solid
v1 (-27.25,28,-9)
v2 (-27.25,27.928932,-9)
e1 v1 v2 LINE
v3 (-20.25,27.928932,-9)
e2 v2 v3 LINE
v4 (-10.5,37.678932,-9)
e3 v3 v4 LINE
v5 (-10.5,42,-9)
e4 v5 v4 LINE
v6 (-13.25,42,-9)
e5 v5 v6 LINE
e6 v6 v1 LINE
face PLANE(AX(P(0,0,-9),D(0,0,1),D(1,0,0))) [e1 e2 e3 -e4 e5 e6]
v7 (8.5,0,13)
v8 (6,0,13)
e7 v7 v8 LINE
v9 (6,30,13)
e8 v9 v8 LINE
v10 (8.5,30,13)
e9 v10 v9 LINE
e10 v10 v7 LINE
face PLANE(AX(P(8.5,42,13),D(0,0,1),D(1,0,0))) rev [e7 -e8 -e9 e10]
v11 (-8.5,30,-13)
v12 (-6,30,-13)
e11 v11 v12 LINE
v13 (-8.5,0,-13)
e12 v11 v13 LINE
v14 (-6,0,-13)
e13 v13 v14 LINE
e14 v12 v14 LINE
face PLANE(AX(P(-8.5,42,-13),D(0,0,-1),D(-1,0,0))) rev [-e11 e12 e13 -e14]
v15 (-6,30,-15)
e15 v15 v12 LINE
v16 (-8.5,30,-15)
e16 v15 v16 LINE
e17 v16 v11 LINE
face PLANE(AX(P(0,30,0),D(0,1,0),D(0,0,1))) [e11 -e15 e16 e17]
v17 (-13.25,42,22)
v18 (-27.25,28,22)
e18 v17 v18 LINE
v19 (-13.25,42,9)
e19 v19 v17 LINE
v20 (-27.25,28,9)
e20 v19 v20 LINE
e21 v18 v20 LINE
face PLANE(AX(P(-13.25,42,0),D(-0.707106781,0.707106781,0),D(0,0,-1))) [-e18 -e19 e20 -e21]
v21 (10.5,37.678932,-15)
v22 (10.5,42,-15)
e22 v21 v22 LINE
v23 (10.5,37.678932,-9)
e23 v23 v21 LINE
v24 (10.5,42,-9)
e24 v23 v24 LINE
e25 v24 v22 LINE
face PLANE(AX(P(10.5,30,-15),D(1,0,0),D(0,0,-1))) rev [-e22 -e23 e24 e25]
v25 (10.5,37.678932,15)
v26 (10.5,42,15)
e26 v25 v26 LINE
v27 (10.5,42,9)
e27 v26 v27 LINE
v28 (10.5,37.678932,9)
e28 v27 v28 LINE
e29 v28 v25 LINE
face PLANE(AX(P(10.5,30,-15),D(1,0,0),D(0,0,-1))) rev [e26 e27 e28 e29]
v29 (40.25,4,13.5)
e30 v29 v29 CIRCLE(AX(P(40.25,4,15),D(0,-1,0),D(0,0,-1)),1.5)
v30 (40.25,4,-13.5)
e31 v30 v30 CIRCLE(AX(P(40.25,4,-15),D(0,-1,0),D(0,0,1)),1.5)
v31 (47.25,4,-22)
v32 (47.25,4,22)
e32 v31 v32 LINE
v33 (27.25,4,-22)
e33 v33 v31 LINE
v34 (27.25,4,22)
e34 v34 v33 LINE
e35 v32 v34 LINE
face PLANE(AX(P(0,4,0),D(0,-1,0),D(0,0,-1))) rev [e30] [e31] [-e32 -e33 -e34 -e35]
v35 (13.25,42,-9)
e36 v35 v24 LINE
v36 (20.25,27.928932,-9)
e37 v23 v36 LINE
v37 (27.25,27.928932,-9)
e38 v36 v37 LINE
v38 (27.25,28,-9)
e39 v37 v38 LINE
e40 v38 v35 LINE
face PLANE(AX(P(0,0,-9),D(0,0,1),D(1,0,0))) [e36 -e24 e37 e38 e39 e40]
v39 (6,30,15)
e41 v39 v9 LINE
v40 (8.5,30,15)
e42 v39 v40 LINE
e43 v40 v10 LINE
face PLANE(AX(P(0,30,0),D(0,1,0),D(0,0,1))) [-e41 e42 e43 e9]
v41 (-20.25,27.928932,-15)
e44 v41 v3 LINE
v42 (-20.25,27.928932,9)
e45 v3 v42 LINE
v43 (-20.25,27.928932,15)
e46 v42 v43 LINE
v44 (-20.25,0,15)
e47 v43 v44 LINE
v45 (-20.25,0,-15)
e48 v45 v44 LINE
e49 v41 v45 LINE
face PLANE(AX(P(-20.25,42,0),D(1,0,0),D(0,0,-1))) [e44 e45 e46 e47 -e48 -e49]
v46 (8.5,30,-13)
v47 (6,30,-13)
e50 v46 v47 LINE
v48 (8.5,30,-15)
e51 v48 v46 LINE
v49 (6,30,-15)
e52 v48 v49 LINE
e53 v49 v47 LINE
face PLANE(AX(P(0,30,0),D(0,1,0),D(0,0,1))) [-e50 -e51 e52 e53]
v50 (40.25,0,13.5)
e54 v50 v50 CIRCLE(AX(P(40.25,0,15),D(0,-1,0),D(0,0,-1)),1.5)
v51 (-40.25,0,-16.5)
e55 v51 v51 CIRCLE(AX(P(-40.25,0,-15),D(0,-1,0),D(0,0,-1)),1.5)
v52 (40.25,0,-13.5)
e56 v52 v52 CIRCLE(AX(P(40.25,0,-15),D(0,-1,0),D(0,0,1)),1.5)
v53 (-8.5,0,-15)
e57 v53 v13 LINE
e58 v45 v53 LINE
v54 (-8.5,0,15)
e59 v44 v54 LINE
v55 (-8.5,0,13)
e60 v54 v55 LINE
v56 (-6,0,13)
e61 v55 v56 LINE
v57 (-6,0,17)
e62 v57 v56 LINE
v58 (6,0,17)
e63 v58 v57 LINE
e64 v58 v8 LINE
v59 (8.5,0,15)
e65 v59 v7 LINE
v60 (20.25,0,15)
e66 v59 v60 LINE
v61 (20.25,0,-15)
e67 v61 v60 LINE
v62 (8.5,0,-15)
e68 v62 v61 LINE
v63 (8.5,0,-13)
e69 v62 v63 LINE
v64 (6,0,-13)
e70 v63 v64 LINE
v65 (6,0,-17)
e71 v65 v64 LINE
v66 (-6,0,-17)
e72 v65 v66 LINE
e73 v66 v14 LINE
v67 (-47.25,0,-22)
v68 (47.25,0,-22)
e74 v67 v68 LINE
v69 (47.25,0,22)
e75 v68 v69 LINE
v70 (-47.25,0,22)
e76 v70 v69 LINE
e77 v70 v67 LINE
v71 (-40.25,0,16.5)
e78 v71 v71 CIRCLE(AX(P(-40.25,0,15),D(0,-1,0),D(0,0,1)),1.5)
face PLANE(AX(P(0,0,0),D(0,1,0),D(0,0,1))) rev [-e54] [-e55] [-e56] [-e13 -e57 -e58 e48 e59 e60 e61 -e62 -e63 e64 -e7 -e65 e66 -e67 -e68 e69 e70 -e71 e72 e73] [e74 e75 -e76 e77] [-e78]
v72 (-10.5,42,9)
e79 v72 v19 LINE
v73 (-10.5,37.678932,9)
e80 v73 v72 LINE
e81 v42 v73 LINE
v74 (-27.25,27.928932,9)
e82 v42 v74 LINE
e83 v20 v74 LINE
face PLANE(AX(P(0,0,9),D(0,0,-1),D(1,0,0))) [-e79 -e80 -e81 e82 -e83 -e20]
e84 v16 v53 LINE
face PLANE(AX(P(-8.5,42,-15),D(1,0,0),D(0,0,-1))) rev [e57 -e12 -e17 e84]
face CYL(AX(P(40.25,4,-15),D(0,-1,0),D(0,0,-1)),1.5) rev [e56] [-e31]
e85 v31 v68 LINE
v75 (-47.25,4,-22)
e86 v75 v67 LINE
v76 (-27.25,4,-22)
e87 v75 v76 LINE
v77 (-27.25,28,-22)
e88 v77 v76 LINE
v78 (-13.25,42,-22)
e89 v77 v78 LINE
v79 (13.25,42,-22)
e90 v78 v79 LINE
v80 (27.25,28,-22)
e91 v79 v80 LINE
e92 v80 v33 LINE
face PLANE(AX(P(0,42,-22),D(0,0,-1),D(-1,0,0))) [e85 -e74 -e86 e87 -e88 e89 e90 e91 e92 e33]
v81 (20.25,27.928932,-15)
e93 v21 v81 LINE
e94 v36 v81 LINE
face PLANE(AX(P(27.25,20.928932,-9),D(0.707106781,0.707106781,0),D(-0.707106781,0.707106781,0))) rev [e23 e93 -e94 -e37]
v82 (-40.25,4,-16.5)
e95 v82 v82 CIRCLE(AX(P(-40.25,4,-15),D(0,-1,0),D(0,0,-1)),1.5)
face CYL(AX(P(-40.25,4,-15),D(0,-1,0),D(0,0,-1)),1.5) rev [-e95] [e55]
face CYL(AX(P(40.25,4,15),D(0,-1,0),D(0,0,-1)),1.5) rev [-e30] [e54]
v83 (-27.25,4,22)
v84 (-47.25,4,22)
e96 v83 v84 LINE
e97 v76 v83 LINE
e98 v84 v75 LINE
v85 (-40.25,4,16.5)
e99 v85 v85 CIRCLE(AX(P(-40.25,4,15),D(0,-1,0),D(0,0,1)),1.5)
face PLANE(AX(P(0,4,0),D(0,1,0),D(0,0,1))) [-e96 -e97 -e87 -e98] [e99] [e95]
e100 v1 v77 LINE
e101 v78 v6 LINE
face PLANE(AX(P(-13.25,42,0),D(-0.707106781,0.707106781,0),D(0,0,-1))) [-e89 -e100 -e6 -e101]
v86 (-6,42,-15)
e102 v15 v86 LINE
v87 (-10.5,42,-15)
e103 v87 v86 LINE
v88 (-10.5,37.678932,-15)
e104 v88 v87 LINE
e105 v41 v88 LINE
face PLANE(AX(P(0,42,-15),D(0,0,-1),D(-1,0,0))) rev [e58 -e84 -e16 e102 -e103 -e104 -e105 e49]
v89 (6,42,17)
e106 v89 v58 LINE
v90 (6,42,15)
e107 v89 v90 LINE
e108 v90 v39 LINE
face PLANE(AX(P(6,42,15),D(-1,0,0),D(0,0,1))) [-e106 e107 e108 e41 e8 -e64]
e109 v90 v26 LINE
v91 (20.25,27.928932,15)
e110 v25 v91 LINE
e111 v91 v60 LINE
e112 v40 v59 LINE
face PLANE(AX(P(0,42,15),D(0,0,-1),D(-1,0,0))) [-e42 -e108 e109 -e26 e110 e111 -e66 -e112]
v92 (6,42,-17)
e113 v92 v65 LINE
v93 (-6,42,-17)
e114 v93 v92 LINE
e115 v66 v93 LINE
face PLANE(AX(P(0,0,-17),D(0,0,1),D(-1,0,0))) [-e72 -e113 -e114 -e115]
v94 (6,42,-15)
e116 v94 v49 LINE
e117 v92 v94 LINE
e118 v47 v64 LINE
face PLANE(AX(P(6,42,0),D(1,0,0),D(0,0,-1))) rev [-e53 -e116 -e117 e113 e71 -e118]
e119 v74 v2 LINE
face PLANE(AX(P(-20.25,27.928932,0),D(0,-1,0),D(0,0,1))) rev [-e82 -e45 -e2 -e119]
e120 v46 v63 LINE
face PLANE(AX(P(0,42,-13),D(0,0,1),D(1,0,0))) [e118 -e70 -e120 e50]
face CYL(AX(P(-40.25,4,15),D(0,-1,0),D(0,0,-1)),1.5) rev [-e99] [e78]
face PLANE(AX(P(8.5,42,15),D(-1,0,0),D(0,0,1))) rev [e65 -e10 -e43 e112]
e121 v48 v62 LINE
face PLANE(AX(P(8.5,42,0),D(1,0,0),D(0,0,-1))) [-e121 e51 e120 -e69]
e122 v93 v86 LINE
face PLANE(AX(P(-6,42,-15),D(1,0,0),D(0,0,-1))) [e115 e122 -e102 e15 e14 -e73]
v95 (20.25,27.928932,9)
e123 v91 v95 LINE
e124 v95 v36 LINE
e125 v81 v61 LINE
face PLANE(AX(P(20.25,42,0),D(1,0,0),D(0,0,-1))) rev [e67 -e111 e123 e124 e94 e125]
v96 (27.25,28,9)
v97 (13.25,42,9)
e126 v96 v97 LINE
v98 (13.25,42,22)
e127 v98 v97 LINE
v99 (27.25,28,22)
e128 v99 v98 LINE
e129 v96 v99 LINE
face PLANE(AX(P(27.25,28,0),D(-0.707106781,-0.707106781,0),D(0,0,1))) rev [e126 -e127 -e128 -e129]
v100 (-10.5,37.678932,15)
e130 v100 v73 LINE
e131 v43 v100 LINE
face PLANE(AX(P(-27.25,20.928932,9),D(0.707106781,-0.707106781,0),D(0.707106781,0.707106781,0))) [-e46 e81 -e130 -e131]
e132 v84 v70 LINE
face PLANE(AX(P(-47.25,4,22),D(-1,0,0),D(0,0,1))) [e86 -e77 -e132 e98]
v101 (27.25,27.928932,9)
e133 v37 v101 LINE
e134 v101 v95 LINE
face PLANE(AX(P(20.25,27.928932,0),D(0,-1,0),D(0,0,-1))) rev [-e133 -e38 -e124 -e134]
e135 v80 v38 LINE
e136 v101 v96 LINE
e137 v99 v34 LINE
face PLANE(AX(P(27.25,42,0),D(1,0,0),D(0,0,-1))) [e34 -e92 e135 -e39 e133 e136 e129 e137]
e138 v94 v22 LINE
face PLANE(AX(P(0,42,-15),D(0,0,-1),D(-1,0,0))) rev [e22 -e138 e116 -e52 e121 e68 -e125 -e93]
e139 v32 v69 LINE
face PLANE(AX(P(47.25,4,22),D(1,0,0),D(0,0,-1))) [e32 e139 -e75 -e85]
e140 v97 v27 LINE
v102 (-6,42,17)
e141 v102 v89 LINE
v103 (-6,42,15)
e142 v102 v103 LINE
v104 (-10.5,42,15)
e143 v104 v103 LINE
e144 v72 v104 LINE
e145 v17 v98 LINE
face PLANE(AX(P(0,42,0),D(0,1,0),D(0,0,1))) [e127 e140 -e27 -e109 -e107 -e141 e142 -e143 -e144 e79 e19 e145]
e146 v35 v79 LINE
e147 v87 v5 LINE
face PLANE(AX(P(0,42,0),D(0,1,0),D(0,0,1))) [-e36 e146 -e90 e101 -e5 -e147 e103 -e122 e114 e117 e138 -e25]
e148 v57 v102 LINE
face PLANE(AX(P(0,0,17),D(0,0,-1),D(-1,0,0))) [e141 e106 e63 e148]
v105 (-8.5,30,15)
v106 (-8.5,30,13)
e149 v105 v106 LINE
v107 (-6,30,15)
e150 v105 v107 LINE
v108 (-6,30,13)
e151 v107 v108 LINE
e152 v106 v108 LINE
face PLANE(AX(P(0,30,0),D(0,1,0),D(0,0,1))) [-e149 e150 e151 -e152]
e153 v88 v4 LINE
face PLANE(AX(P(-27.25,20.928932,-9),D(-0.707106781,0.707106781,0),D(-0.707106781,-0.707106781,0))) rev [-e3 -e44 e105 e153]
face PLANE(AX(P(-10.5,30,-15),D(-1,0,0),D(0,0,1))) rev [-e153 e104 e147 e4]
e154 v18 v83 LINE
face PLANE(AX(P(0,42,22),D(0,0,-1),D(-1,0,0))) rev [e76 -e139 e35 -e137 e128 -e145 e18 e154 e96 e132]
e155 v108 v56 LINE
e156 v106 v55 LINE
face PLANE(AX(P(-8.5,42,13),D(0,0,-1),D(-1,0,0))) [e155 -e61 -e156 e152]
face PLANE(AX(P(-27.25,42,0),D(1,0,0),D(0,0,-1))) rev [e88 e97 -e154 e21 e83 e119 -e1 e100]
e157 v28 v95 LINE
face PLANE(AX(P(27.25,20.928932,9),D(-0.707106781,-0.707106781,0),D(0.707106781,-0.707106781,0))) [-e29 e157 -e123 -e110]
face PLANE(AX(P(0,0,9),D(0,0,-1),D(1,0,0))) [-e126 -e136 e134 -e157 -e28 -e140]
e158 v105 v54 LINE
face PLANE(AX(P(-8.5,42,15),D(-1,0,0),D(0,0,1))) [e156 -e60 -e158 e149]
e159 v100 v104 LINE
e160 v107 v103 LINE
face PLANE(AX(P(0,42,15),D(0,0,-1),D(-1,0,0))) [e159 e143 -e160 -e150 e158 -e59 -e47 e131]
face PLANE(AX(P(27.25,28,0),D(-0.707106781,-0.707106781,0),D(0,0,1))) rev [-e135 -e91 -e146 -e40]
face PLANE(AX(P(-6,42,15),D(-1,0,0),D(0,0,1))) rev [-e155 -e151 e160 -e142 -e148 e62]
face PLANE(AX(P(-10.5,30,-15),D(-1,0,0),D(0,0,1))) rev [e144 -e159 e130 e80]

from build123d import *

# Parameters (mm, degrees)
SKETCH1_W           = 54.5
SKETCH1_H           = 44
BOSS_EXTRUDE1_DEPTH = 42
CHAMFER2_SIZE       = 14
CHAMFER3_SIZE       = 10
CHAMFER3_SIZE_2     = 7.071067812
BOSS_EXTRUDE2_DEPTH = 6
SKETCH4_W           = 20
SKETCH4_H           = 44
SKETCH4_R           = 1.5
BOSS_EXTRUDE3_DEPTH = 4
SKETCH5_W           = 21
SKETCH5_H           = 30
CUT_EXTRUDE1_DEPTH  = 12
SKETCH6_W           = 12
SKETCH6_H           = 42
CUT_EXTRUDE2_DEPTH  = 2


with BuildPart() as part:
    # Sketch1 → Boss-Extrude1 (new body)
    with BuildSketch(Plane(origin=(0, 0, 0), x_dir=(1, 0, 0), z_dir=(0, 1, 0))):
        Rectangle(SKETCH1_W, SKETCH1_H)
        Polygon((-6, 13), (-6, 15), (6, 15), (6, 13), (8.5, 13), (8.5, 15), (20.25, 15), (20.25, -15), (8.5, -15), (8.5, -13), (6, -13), (6, -15), (-6, -15), (-6, -13), (-8.5, -13), (-8.5, -15), (-20.25, -15), (-20.25, 15), (-8.5, 15), (-8.5, 13), align=None, mode=Mode.SUBTRACT)
    extrude(amount=BOSS_EXTRUDE1_DEPTH)

    # Chamfer2
    # the kernel refuses this chamfer: 14 mm, written as the material it takes off along each edge
    with BuildSketch(Plane(origin=(27.25, 42, 58.003561832), x_dir=(0.027495876610586365, -0.9996219169112968, 0), z_dir=(0, 0, -1)), Plane(origin=(-27.25, 42, -58.003561832), x_dir=(-0.027495876610586365, -0.9996219169112968, 0), z_dir=(0, 0, 1))) as chamfer2_piece_1:
        Polygon((CHAMFER2_SIZE * 0.999621916911, CHAMFER2_SIZE * 0.0274958766106), (-CHAMFER2_SIZE * 0.0274958766106, CHAMFER2_SIZE * 0.999621916911), (0, 0), align=None)
    extrude(amount=116.007123663, mode=Mode.SUBTRACT)

    # Chamfer3
    # the kernel refuses this chamfer: 10, 7.071067812 mm, written as the material it takes off along each edge
    with BuildSketch(Plane(origin=(20.25, 35, -15), x_dir=(0.7262819568769621, -0.6873969152643694, 0), z_dir=(0, 0, 1)), Plane(origin=(-20.25, 35, 15), x_dir=(-0.7262819568769624, -0.6873969152643691, 0), z_dir=(0, 0, -1))) as chamfer3_piece_1:
        Polygon((CHAMFER3_SIZE * 0.999621916911, -CHAMFER3_SIZE * 0.0274958766106), (CHAMFER3_SIZE_2 * 0.687396915251, -CHAMFER3_SIZE_2 * 0.726281956863), (0, 0), align=None)
    extrude(amount=30, mode=Mode.SUBTRACT)

    # Sketch2 → Boss-Extrude2 (add)
    with BuildSketch(Plane.XY.offset(-15)):
        Polygon((-27.25, 20.928932188), (-6.178932188, 42), (-13.25, 42), (-27.25, 28), align=None)
        Polygon((13.25, 42), (6.178932188, 42), (27.25, 20.928932188), (27.25, 28), align=None)
    boss_extrude2 = extrude(amount=BOSS_EXTRUDE2_DEPTH)

    # Mirror2: Boss-Extrude2 across plane
    add(boss_extrude2.mirror(Plane.XY))

    # Sketch4 → Boss-Extrude3 (add)
    # profile 1 of 2: a face of its own
    with BuildSketch(Plane.XZ):
        with Locations((37.25, 0)):
            Rectangle(SKETCH4_W, SKETCH4_H)
        with Locations(Location((40.25, 15, 0), (0, 0, 270))):
            Circle(SKETCH4_R, mode=Mode.SUBTRACT)
        with Locations(Location((40.25, -15, 0), (0, 0, 90))):
            Circle(SKETCH4_R, mode=Mode.SUBTRACT)
    # profile 2 of 2: a face of its own
    with BuildSketch(Plane.XZ):
        with Locations((-37.25, 0)):
            Rectangle(SKETCH4_W, SKETCH4_H)
        with Locations(Location((-40.25, -15, 0), (0, 0, 270))):
            Circle(SKETCH4_R, mode=Mode.SUBTRACT)
        with Locations(Location((-40.25, 15, 0), (0, 0, 90))):
            Circle(SKETCH4_R, mode=Mode.SUBTRACT)
    extrude(amount=-BOSS_EXTRUDE3_DEPTH)

    # Sketch5 → Cut-Extrude1 (cut)
    with BuildSketch(Plane(origin=(0, 42, 0), x_dir=(1, 0, 0), z_dir=(0, 1, 0))):
        Rectangle(SKETCH5_W, SKETCH5_H)
    extrude(amount=-CUT_EXTRUDE1_DEPTH, mode=Mode.SUBTRACT)

    # Sketch6 → Cut-Extrude2 (cut)
    with BuildSketch(Plane(origin=(0, 0, 15), x_dir=(-1, 0, 0), z_dir=(0, 0, -1))):
        with Locations((0, 21)):
            Rectangle(SKETCH6_W, SKETCH6_H)
    cut_extrude2 = extrude(amount=-CUT_EXTRUDE2_DEPTH, mode=Mode.SUBTRACT)

    # Mirror3: Cut-Extrude2 across plane
    add(cut_extrude2.mirror(Plane.XY), mode=Mode.SUBTRACT)


solid = part.part
